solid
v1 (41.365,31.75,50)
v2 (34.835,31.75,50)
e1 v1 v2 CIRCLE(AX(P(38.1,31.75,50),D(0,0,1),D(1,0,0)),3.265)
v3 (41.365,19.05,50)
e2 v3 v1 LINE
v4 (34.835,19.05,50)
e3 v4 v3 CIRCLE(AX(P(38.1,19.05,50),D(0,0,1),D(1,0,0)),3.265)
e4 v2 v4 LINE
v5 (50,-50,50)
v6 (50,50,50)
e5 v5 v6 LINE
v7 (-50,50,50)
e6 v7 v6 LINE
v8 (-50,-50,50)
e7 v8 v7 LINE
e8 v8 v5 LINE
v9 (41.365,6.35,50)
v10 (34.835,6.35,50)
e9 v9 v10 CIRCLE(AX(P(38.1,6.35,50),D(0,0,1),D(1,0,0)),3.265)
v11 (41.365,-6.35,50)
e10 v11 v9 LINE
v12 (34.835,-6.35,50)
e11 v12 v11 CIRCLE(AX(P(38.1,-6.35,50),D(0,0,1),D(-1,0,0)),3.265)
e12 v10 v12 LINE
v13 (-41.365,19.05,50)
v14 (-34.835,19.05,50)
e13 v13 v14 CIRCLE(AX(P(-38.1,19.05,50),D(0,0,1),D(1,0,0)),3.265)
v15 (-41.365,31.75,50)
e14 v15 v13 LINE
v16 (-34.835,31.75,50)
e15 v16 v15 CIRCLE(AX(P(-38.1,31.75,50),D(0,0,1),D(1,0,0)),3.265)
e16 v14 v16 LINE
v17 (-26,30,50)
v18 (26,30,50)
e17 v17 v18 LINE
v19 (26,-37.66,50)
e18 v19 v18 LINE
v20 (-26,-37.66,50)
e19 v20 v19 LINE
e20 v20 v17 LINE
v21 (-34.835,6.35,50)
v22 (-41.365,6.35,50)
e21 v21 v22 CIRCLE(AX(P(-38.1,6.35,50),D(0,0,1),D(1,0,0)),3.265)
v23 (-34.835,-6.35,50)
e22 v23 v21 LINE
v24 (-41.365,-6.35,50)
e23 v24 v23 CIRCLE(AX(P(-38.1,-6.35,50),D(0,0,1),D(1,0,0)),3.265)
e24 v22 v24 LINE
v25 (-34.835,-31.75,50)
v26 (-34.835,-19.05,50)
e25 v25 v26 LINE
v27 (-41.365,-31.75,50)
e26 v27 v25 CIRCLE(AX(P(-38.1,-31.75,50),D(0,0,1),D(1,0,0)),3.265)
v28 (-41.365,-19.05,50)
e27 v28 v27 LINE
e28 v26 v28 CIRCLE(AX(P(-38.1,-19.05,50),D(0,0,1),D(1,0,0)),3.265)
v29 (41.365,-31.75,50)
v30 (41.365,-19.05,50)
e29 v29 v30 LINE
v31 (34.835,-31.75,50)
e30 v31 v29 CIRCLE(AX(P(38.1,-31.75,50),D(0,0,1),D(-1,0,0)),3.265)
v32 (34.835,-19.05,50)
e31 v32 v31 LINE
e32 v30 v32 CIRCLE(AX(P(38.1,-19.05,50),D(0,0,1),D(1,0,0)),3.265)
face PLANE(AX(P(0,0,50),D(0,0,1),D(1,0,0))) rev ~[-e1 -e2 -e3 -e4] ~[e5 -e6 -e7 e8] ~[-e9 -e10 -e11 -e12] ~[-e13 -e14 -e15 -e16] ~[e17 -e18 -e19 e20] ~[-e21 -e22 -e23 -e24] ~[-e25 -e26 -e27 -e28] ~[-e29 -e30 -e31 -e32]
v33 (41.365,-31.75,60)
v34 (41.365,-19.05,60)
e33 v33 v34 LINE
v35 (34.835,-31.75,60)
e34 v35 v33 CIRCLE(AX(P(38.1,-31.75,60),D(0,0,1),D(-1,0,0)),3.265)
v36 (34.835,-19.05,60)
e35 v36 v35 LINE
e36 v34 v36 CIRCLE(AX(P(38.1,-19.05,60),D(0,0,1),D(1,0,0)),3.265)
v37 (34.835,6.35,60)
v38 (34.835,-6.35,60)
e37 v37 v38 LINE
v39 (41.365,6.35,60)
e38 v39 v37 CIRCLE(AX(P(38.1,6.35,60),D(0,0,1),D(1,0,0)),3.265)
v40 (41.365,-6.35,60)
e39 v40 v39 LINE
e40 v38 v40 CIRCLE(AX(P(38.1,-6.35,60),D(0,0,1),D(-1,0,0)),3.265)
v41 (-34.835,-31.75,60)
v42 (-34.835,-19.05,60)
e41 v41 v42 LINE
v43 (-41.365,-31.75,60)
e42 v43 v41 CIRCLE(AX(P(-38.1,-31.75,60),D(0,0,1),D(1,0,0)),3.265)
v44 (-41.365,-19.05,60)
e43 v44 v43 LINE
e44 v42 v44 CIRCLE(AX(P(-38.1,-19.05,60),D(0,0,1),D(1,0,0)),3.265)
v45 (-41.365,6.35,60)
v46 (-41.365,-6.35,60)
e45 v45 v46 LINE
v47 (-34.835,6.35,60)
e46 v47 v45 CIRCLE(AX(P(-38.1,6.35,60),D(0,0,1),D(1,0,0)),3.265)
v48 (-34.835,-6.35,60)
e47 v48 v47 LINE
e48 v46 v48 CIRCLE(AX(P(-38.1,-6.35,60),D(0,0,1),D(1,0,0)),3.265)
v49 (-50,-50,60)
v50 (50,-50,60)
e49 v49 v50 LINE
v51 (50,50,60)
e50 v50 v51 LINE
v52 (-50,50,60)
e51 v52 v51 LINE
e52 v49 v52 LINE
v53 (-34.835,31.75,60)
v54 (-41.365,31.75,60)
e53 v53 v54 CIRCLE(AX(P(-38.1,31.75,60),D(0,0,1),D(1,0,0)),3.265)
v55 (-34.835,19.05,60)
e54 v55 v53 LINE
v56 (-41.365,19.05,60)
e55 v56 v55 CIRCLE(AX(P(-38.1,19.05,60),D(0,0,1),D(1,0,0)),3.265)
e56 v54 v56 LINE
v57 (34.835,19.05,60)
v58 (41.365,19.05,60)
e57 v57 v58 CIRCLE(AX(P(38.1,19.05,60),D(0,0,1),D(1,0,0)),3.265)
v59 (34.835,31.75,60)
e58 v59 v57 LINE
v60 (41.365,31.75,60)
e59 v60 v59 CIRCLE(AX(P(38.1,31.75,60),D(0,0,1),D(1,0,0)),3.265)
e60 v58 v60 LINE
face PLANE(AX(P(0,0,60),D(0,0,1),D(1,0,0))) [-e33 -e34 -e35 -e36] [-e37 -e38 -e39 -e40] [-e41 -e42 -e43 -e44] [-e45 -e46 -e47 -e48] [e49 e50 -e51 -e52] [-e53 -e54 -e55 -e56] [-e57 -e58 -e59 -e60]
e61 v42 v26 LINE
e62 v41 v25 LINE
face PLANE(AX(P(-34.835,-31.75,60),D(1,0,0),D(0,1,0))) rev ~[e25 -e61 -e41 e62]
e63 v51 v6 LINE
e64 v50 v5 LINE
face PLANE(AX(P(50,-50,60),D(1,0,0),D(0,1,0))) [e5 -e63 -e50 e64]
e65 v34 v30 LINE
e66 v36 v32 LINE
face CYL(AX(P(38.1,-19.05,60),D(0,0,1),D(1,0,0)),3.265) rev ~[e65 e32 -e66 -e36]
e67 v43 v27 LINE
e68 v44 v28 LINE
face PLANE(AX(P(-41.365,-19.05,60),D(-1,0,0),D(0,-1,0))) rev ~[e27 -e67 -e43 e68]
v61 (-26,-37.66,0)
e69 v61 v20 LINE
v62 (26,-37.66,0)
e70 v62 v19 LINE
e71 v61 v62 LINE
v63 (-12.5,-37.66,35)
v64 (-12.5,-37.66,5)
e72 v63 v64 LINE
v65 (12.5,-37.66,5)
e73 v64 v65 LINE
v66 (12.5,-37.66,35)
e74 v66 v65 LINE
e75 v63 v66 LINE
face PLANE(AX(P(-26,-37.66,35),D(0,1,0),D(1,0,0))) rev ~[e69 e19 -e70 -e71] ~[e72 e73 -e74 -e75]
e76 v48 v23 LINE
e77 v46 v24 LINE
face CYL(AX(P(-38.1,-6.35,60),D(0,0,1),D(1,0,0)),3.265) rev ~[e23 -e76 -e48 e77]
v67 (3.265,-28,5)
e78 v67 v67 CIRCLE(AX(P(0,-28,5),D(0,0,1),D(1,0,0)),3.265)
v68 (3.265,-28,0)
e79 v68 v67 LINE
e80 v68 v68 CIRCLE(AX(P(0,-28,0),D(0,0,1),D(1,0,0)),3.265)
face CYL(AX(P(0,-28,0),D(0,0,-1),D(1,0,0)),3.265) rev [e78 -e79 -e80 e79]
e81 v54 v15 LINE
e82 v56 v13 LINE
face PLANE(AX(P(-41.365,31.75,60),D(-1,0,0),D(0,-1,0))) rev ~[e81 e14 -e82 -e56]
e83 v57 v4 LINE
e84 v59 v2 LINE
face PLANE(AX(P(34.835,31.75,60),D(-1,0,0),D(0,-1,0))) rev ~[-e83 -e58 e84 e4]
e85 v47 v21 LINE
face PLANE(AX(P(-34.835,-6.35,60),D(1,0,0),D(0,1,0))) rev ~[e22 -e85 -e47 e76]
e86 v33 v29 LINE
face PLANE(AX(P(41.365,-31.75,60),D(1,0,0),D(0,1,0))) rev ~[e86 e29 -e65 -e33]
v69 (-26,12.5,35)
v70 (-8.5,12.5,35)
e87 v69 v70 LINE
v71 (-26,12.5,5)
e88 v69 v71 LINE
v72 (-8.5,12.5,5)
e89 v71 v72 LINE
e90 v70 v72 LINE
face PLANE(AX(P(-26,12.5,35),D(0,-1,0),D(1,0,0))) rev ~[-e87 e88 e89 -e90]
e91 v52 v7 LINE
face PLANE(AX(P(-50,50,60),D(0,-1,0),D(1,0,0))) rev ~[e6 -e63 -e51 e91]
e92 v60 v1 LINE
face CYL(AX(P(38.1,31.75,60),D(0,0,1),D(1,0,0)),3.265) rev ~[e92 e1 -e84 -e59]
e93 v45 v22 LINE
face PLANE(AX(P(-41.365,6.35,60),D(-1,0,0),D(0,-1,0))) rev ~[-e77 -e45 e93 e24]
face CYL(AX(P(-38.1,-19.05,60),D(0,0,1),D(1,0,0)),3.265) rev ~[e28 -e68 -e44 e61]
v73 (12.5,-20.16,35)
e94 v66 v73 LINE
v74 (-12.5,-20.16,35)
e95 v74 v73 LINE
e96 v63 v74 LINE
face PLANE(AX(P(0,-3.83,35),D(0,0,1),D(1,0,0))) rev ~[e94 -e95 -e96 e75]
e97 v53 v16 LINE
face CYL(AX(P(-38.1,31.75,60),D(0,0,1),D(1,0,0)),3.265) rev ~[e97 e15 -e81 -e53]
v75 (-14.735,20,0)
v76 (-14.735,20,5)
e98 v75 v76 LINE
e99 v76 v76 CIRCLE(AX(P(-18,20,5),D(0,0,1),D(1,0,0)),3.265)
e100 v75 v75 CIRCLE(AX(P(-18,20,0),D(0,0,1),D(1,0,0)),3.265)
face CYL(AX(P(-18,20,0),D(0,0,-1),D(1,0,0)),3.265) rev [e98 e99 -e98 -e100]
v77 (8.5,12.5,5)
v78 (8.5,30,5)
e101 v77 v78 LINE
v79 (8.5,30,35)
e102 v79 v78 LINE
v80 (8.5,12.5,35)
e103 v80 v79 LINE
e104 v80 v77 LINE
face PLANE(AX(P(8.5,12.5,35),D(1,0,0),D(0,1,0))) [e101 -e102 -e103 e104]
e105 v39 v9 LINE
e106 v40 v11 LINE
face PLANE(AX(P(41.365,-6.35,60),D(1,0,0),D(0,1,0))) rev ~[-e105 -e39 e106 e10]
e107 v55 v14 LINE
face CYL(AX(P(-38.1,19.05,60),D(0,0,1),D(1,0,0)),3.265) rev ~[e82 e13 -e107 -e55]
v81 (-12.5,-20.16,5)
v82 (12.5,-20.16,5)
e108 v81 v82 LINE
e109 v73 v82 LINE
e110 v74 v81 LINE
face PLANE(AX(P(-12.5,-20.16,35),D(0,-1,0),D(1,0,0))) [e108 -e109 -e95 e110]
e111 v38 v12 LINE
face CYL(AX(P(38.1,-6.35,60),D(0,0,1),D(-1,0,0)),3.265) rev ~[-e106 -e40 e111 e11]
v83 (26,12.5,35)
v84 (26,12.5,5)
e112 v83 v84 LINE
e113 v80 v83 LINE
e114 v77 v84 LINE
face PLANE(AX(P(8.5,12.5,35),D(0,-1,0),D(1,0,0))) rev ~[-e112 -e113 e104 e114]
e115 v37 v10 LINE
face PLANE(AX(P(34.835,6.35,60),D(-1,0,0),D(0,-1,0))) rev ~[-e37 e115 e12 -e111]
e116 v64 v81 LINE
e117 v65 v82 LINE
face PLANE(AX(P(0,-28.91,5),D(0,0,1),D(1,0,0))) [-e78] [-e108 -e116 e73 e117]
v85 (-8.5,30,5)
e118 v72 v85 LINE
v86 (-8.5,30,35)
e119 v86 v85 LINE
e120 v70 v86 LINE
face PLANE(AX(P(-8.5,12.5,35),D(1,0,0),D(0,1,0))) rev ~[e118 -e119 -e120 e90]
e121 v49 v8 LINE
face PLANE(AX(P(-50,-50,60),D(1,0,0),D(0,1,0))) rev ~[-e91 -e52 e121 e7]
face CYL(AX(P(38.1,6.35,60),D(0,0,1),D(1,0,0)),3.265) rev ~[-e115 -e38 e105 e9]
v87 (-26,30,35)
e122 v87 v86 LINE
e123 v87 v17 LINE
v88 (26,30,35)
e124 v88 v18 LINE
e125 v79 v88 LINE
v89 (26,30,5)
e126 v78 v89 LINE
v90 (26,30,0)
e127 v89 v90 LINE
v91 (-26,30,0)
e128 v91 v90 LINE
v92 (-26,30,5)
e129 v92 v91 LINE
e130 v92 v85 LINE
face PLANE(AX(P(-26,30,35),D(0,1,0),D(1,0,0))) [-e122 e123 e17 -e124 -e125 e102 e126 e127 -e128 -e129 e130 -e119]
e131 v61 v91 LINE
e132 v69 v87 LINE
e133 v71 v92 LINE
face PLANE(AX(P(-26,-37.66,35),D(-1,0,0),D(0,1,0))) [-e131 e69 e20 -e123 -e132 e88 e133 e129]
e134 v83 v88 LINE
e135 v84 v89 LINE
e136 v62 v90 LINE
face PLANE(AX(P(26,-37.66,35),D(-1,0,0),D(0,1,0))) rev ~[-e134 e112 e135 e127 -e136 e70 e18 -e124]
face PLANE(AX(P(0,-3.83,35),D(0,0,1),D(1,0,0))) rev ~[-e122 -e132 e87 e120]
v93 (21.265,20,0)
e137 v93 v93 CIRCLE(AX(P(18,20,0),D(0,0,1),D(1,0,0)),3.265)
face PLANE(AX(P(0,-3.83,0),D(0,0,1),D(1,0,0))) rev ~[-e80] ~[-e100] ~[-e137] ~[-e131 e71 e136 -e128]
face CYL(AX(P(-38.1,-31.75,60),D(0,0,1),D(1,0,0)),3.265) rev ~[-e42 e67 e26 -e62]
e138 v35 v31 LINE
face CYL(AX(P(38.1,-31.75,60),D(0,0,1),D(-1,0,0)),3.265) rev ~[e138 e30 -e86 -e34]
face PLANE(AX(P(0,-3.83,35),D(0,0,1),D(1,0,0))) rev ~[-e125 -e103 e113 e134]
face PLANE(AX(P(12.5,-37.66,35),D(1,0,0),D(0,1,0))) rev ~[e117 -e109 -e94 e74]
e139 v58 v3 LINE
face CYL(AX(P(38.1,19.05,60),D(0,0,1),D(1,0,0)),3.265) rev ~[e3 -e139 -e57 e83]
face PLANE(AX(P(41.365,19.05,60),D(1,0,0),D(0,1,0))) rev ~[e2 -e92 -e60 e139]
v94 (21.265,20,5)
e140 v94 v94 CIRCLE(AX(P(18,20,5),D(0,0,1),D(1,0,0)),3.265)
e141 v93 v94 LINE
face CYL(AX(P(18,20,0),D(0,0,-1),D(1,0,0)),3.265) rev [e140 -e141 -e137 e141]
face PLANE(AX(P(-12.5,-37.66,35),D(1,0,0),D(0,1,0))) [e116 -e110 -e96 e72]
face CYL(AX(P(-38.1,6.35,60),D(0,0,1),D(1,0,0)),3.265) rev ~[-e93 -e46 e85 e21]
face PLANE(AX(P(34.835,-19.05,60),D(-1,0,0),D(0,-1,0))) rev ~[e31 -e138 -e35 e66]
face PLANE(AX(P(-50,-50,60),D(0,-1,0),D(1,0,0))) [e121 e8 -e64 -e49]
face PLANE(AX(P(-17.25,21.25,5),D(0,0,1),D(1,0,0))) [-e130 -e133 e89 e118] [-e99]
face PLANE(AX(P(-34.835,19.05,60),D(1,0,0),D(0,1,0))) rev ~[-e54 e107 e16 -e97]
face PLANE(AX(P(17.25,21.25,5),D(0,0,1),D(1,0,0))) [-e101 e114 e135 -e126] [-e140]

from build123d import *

# Parameters (mm, degrees)
F0_W      = 52
F0_H      = 67.66
F2_DEPTH  = 5
F1_R      = 3.265
F3_DEPTH  = 5
F4_W      = 52
F4_H      = 67.66
F5_DEPTH  = 30
F6_W      = 17.5
F6_H      = 17.5
F6_W_2    = 25
F7_DEPTH  = 30
F8_W      = 52
F8_H      = 67.66
F9_DEPTH  = 25
F10_W     = 100
F10_H     = 100
F11_DEPTH = 10
F13_DEPTH = 10


with BuildPart() as f2:
    # F0 (on Top) → F2 (new body)
    with BuildSketch(Plane.XY):
        with Locations((0, -3.83)):
            Rectangle(F0_W, F0_H)
    extrude(amount=F2_DEPTH)

    # F1 (on face) → F3 (cut)
    with BuildSketch(Plane.XY):
        with Locations((-18, 20)):
            Circle(F1_R)
        with Locations((18, 20)):
            Circle(F1_R)
        with Locations((0, -28)):
            Circle(F1_R)
    extrude(amount=F3_DEPTH, mode=Mode.SUBTRACT)

    # F4 (on face) → F5 (join)
    with BuildSketch(Plane.XY.offset(5)):
        with Locations((0, -3.83)):
            Rectangle(F4_W, F4_H)
    extrude(amount=F5_DEPTH)

    # F6 (on face) → F7 (cut)
    with BuildSketch(Plane.XY.offset(35)):
        with Locations((-17.25, 21.25)):
            Rectangle(F6_W, F6_H)
        with Locations((17.25, 21.25)):
            Rectangle(F6_W, F6_H)
        with Locations((0, -28.91)):
            Rectangle(F6_W_2, F6_H)
    extrude(amount=-F7_DEPTH, mode=Mode.SUBTRACT)

    # F8 (on face) → F9 (join)
    with BuildSketch(Plane.XY.offset(35)):
        with Locations((0, -3.83)):
            Rectangle(F8_W, F8_H)
    extrude(amount=F9_DEPTH)

    # F10 (on face) → F11 (join)
    with BuildSketch(Plane.XY.offset(60)):
        Rectangle(F10_W, F10_H)
    extrude(amount=-F11_DEPTH)

    # F12 (on face) → F13 (cut)
    with BuildSketch(Plane.XY.offset(60)):
        with BuildLine():
            Line((34.835, -6.35), (41.365, -6.35))
            ThreePointArc((41.365, -6.35), (38.1, -3.085), (34.835, -6.35))
        make_face()
        with BuildLine():
            ThreePointArc((34.835, -6.35), (38.1, -9.615), (41.365, -6.35))
            Line((41.365, -6.35), (34.835, -6.35))
        make_face()
        with BuildLine():
            ThreePointArc((34.835, -6.35), (38.1, -3.085), (41.365, -6.35))
            Line((41.365, -6.35), (41.365, 6.35))
            ThreePointArc((41.365, 6.35), (38.1, 3.085), (34.835, 6.35))
            Line((34.835, 6.35), (34.835, -6.35))
        make_face()
        with BuildLine():
            Line((34.835, 6.35), (41.365, 6.35))
            ThreePointArc((41.365, 6.35), (38.1, 9.615), (34.835, 6.35))
        make_face()
        with BuildLine():
            ThreePointArc((34.835, 6.35), (38.1, 3.085), (41.365, 6.35))
            Line((41.365, 6.35), (34.835, 6.35))
        make_face()
        with BuildLine():
            Line((34.835, -31.75), (41.365, -31.75))
            ThreePointArc((41.365, -31.75), (38.1, -28.485), (34.835, -31.75))
        make_face()
        with BuildLine():
            ThreePointArc((34.835, -31.75), (38.1, -35.015), (41.365, -31.75))
            Line((41.365, -31.75), (34.835, -31.75))
        make_face()
        with BuildLine():
            ThreePointArc((34.835, -31.75), (38.1, -28.485), (41.365, -31.75))
            Line((41.365, -31.75), (41.365, -19.05))
            ThreePointArc((41.365, -19.05), (38.1, -22.315), (34.835, -19.05))
            Line((34.835, -19.05), (34.835, -31.75))
        make_face()
        with BuildLine():
            Line((34.835, -19.05), (41.365, -19.05))
            ThreePointArc((41.365, -19.05), (38.1, -15.785), (34.835, -19.05))
        make_face()
        with BuildLine():
            ThreePointArc((34.835, -19.05), (38.1, -22.315), (41.365, -19.05))
            Line((41.365, -19.05), (34.835, -19.05))
        make_face()
        with BuildLine():
            ThreePointArc((34.835, 31.75), (38.1, 28.485), (41.365, 31.75))
            ThreePointArc((41.365, 31.75), (38.1, 35.015), (34.835, 31.75))
        make_face()
        with BuildLine():
            Line((41.365, 19.05), (41.365, 31.75))
            ThreePointArc((41.365, 31.75), (38.1, 28.485), (34.835, 31.75))
            Line((34.835, 31.75), (34.835, 19.05))
            ThreePointArc((34.835, 19.05), (38.1, 22.315), (41.365, 19.05))
        make_face()
        with BuildLine():
            ThreePointArc((34.835, 19.05), (38.1, 15.785), (41.365, 19.05))
            ThreePointArc((41.365, 19.05), (38.1, 22.315), (34.835, 19.05))
        make_face()
        with BuildLine():
            ThreePointArc((-41.365, -31.75), (-38.1, -35.015), (-34.835, -31.75))
            ThreePointArc((-34.835, -31.75), (-38.1, -28.485), (-41.365, -31.75))
        make_face()
        with BuildLine():
            ThreePointArc((-41.365, -31.75), (-38.1, -28.485), (-34.835, -31.75))
            Line((-34.835, -31.75), (-34.835, -19.05))
            ThreePointArc((-34.835, -19.05), (-38.1, -22.315), (-41.365, -19.05))
            Line((-41.365, -19.05), (-41.365, -31.75))
        make_face()
        with BuildLine():
            ThreePointArc((-41.365, -19.05), (-38.1, -22.315), (-34.835, -19.05))
            ThreePointArc((-34.835, -19.05), (-38.1, -15.785), (-41.365, -19.05))
        make_face()
        with BuildLine():
            ThreePointArc((-41.365, -6.35), (-38.1, -9.615), (-34.835, -6.35))
            ThreePointArc((-34.835, -6.35), (-38.1, -3.085), (-41.365, -6.35))
        make_face()
        with BuildLine():
            ThreePointArc((-41.365, -6.35), (-38.1, -3.085), (-34.835, -6.35))
            Line((-34.835, -6.35), (-34.835, 6.35))
            ThreePointArc((-34.835, 6.35), (-38.1, 3.085), (-41.365, 6.35))
            Line((-41.365, 6.35), (-41.365, -6.35))
        make_face()
        with BuildLine():
            ThreePointArc((-41.365, 6.35), (-38.1, 3.085), (-34.835, 6.35))
            ThreePointArc((-34.835, 6.35), (-38.1, 9.615), (-41.365, 6.35))
        make_face()
        with BuildLine():
            ThreePointArc((-41.365, 19.05), (-38.1, 15.785), (-34.835, 19.05))
            ThreePointArc((-34.835, 19.05), (-38.1, 22.315), (-41.365, 19.05))
        make_face()
        with BuildLine():
            ThreePointArc((-41.365, 19.05), (-38.1, 22.315), (-34.835, 19.05))
            Line((-34.835, 19.05), (-34.835, 31.75))
            ThreePointArc((-34.835, 31.75), (-38.1, 28.485), (-41.365, 31.75))
            Line((-41.365, 31.75), (-41.365, 19.05))
        make_face()
        with BuildLine():
            ThreePointArc((-41.365, 31.75), (-38.1, 28.485), (-34.835, 31.75))
            ThreePointArc((-34.835, 31.75), (-38.1, 35.015), (-41.365, 31.75))
        make_face()
    extrude(amount=-F13_DEPTH, mode=Mode.SUBTRACT)


solid = f2.part
